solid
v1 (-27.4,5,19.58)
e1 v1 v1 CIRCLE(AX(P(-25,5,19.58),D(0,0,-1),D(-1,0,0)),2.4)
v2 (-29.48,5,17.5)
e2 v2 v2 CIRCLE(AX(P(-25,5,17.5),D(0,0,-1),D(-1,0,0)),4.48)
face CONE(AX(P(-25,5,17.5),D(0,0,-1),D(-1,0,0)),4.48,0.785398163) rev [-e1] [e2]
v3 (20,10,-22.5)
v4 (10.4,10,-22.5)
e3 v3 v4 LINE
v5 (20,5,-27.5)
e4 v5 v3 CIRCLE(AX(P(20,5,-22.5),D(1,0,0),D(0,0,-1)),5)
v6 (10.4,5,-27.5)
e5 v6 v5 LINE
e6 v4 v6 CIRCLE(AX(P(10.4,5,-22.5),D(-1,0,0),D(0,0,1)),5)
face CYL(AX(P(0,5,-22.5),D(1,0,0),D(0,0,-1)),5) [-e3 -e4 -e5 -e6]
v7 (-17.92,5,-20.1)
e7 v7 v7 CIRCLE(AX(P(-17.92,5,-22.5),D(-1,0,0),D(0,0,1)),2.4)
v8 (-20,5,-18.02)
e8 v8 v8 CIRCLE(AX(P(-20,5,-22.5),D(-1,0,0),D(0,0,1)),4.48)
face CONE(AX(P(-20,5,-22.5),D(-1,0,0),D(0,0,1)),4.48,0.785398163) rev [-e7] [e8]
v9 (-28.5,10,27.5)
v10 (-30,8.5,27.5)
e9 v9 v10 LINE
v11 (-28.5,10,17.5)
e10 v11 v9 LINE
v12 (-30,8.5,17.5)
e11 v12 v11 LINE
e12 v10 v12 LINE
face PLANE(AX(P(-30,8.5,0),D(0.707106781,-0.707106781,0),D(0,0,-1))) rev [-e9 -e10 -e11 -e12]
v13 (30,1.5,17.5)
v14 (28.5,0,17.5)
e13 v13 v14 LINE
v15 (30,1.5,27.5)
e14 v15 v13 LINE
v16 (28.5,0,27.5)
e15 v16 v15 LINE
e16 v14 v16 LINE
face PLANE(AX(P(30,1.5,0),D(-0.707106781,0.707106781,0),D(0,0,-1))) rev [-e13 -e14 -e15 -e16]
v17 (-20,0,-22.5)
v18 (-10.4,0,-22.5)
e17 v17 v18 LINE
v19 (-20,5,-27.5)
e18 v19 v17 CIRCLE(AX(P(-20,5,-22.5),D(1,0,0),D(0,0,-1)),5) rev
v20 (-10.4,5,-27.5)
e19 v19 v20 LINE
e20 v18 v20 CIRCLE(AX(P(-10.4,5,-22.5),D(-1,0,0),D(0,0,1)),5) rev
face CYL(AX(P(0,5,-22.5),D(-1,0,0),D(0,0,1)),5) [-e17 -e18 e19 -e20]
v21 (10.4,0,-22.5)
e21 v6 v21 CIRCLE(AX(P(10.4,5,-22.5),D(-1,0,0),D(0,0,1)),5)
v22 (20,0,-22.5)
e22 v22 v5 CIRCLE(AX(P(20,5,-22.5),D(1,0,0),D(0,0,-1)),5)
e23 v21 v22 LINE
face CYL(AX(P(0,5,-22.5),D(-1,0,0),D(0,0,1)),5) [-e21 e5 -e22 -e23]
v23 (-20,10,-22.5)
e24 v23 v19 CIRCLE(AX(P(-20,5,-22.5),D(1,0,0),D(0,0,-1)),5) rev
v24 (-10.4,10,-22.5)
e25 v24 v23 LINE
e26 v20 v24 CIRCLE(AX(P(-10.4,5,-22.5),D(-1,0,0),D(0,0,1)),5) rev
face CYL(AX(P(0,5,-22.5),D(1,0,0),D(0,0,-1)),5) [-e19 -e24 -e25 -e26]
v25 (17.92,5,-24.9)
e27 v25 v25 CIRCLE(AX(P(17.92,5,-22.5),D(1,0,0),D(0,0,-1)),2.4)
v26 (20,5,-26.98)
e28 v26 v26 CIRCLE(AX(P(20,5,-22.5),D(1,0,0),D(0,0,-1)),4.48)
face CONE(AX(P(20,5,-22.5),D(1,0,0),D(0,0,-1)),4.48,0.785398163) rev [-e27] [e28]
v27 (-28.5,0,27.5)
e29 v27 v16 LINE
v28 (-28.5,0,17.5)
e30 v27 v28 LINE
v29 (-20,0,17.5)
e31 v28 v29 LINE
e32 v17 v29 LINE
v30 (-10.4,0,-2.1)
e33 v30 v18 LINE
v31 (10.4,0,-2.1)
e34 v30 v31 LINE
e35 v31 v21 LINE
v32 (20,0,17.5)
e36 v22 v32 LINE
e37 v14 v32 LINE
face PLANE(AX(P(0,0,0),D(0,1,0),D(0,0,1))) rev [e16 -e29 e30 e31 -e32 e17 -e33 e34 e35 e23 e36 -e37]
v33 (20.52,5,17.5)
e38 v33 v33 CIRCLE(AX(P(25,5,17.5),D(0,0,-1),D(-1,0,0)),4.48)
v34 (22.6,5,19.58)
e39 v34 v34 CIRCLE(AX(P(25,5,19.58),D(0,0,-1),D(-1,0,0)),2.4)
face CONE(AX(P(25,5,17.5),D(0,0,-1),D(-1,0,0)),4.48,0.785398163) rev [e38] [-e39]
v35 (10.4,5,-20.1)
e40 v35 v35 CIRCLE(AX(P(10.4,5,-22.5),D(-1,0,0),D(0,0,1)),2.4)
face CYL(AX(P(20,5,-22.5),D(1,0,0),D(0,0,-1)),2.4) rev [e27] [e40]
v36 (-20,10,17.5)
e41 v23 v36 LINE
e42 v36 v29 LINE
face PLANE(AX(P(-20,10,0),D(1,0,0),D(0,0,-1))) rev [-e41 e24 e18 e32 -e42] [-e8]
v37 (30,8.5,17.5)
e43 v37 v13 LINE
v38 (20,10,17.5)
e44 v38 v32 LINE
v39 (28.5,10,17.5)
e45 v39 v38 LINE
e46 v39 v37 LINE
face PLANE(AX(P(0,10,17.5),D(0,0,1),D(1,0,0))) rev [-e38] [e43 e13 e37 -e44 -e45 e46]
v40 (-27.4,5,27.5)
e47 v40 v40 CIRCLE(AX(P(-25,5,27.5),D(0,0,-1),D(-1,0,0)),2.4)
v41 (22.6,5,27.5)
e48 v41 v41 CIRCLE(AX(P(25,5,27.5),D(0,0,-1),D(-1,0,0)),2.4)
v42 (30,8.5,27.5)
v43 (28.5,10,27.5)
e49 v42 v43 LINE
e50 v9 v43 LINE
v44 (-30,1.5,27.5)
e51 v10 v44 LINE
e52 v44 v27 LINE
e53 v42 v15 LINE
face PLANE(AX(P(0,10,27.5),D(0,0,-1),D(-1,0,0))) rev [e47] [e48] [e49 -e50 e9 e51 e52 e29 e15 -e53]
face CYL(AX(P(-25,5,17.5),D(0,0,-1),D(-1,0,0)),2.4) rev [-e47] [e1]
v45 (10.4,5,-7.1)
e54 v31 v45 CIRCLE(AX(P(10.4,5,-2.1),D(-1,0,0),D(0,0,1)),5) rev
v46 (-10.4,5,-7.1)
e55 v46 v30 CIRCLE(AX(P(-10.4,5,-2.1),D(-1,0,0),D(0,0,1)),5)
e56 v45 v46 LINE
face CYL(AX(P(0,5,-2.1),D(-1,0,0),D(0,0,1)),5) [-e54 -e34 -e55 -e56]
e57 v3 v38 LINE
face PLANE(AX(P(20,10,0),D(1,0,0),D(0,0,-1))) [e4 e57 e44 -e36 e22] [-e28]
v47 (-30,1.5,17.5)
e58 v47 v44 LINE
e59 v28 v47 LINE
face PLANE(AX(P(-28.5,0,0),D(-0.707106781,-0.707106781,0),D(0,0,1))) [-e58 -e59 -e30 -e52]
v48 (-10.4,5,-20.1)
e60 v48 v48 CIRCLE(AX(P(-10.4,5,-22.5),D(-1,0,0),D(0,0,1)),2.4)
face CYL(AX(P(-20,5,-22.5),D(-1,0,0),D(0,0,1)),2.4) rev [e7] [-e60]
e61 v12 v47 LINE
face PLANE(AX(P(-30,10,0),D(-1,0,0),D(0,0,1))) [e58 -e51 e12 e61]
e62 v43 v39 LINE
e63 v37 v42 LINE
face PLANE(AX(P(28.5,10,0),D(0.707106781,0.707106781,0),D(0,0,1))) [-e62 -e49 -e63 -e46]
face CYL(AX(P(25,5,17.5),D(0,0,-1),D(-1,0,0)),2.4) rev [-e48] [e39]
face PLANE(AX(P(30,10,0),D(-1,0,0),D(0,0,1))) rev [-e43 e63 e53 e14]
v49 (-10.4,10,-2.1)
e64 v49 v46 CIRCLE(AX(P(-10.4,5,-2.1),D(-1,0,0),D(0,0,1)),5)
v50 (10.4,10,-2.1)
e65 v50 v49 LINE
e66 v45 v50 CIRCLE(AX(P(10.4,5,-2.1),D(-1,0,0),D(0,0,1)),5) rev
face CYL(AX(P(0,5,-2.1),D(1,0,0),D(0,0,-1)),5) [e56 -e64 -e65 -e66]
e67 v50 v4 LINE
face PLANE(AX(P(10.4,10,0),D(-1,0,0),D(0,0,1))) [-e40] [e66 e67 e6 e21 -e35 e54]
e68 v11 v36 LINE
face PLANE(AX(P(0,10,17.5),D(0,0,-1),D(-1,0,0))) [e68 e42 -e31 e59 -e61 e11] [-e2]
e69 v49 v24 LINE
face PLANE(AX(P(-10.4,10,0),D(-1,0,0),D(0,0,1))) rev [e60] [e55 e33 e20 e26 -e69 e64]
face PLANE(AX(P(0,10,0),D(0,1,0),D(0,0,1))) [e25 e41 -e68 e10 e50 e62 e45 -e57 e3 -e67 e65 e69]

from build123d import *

# Parameters (mm, degrees)
BOSS_EXTRUDE1_DEPTH           = 10
FILLET1_R                     = 5
CHAMFER1_SIZE                 = 1.5
CSK_FOR_M4_SFHCS1_D           = 4.8
CSK_FOR_M4_SFHCS1_CSINK_D     = 8.96
CSK_FOR_M4_SFHCS1_CSINK_ANGLE = 90
CSK_FOR_M4_SFHCS2_D           = 4.8
CSK_FOR_M4_SFHCS2_DEPTH       = 9.6
CSK_FOR_M4_SFHCS2_CSINK_D     = 8.96
CSK_FOR_M4_SFHCS2_CSINK_ANGLE = 90


with BuildPart() as part:
    # Sketch1 → Boss-Extrude1 (new body)
    with BuildSketch(Plane(origin=(0, 0, 0), x_dir=(1, 0, 0), z_dir=(0, 1, 0))):
        Polygon((-30, -17.5), (-30, -27.5), (30, -27.5), (30, -17.5), (20, -17.5), (20, 27.5), (10.4, 27.5), (10.4, 7.1), (-10.4, 7.1), (-10.4, 27.5), (-20, 27.5), (-20, -17.5), align=None)
    extrude(amount=BOSS_EXTRUDE1_DEPTH)

    # Fillet1
    fillet1_edges = [part.edges().sort_by_distance(p)[0] for p in [
        (-15.2, 0, -27.5),
        (15.2, 0, -27.5),
        (-15.2, 10, -27.5),
        (15.2, 10, -27.5),
        (0, 10, -7.1),
        (0, 0, -7.1),
    ]]
    fillet(fillet1_edges, radius=FILLET1_R - 0.0001)  # a hair under: the kernel refuses the full size

    # Chamfer1
    chamfer1_edges = [part.edges().sort_by_distance(p)[0] for p in [
        (30, 0, 22.5),
        (-30, 0, 22.5),
        (-30, 10, 22.5),
        (30, 10, 22.5),
    ]]
    chamfer(chamfer1_edges, length=CHAMFER1_SIZE)

    # CSK for M4 SFHCS1 (through all)
    with Locations(Plane(origin=(0, 0, 17.5), x_dir=(-1, 0, 0), z_dir=(0, 0, -1))):
        with Locations((-25, 5), (25, 5)):
            CounterSinkHole(CSK_FOR_M4_SFHCS1_D / 2, CSK_FOR_M4_SFHCS1_CSINK_D / 2, counter_sink_angle=CSK_FOR_M4_SFHCS1_CSINK_ANGLE)

    # CSK for M4 SFHCS2
    with Locations(Plane.ZY.offset(20)):
        with Locations((-22.5, 5)):
            csk_for_m4_sfhcs2 = CounterSinkHole(CSK_FOR_M4_SFHCS2_D / 2, CSK_FOR_M4_SFHCS2_CSINK_D / 2, depth=CSK_FOR_M4_SFHCS2_DEPTH, counter_sink_angle=CSK_FOR_M4_SFHCS2_CSINK_ANGLE)

    # Mirror1: CSK for M4 SFHCS2 across plane
    add(csk_for_m4_sfhcs2.mirror(Plane(origin=(0, 0, 0), x_dir=(0, 0, 1), z_dir=(1, 0, 0))), mode=Mode.SUBTRACT)


solid = part.part
